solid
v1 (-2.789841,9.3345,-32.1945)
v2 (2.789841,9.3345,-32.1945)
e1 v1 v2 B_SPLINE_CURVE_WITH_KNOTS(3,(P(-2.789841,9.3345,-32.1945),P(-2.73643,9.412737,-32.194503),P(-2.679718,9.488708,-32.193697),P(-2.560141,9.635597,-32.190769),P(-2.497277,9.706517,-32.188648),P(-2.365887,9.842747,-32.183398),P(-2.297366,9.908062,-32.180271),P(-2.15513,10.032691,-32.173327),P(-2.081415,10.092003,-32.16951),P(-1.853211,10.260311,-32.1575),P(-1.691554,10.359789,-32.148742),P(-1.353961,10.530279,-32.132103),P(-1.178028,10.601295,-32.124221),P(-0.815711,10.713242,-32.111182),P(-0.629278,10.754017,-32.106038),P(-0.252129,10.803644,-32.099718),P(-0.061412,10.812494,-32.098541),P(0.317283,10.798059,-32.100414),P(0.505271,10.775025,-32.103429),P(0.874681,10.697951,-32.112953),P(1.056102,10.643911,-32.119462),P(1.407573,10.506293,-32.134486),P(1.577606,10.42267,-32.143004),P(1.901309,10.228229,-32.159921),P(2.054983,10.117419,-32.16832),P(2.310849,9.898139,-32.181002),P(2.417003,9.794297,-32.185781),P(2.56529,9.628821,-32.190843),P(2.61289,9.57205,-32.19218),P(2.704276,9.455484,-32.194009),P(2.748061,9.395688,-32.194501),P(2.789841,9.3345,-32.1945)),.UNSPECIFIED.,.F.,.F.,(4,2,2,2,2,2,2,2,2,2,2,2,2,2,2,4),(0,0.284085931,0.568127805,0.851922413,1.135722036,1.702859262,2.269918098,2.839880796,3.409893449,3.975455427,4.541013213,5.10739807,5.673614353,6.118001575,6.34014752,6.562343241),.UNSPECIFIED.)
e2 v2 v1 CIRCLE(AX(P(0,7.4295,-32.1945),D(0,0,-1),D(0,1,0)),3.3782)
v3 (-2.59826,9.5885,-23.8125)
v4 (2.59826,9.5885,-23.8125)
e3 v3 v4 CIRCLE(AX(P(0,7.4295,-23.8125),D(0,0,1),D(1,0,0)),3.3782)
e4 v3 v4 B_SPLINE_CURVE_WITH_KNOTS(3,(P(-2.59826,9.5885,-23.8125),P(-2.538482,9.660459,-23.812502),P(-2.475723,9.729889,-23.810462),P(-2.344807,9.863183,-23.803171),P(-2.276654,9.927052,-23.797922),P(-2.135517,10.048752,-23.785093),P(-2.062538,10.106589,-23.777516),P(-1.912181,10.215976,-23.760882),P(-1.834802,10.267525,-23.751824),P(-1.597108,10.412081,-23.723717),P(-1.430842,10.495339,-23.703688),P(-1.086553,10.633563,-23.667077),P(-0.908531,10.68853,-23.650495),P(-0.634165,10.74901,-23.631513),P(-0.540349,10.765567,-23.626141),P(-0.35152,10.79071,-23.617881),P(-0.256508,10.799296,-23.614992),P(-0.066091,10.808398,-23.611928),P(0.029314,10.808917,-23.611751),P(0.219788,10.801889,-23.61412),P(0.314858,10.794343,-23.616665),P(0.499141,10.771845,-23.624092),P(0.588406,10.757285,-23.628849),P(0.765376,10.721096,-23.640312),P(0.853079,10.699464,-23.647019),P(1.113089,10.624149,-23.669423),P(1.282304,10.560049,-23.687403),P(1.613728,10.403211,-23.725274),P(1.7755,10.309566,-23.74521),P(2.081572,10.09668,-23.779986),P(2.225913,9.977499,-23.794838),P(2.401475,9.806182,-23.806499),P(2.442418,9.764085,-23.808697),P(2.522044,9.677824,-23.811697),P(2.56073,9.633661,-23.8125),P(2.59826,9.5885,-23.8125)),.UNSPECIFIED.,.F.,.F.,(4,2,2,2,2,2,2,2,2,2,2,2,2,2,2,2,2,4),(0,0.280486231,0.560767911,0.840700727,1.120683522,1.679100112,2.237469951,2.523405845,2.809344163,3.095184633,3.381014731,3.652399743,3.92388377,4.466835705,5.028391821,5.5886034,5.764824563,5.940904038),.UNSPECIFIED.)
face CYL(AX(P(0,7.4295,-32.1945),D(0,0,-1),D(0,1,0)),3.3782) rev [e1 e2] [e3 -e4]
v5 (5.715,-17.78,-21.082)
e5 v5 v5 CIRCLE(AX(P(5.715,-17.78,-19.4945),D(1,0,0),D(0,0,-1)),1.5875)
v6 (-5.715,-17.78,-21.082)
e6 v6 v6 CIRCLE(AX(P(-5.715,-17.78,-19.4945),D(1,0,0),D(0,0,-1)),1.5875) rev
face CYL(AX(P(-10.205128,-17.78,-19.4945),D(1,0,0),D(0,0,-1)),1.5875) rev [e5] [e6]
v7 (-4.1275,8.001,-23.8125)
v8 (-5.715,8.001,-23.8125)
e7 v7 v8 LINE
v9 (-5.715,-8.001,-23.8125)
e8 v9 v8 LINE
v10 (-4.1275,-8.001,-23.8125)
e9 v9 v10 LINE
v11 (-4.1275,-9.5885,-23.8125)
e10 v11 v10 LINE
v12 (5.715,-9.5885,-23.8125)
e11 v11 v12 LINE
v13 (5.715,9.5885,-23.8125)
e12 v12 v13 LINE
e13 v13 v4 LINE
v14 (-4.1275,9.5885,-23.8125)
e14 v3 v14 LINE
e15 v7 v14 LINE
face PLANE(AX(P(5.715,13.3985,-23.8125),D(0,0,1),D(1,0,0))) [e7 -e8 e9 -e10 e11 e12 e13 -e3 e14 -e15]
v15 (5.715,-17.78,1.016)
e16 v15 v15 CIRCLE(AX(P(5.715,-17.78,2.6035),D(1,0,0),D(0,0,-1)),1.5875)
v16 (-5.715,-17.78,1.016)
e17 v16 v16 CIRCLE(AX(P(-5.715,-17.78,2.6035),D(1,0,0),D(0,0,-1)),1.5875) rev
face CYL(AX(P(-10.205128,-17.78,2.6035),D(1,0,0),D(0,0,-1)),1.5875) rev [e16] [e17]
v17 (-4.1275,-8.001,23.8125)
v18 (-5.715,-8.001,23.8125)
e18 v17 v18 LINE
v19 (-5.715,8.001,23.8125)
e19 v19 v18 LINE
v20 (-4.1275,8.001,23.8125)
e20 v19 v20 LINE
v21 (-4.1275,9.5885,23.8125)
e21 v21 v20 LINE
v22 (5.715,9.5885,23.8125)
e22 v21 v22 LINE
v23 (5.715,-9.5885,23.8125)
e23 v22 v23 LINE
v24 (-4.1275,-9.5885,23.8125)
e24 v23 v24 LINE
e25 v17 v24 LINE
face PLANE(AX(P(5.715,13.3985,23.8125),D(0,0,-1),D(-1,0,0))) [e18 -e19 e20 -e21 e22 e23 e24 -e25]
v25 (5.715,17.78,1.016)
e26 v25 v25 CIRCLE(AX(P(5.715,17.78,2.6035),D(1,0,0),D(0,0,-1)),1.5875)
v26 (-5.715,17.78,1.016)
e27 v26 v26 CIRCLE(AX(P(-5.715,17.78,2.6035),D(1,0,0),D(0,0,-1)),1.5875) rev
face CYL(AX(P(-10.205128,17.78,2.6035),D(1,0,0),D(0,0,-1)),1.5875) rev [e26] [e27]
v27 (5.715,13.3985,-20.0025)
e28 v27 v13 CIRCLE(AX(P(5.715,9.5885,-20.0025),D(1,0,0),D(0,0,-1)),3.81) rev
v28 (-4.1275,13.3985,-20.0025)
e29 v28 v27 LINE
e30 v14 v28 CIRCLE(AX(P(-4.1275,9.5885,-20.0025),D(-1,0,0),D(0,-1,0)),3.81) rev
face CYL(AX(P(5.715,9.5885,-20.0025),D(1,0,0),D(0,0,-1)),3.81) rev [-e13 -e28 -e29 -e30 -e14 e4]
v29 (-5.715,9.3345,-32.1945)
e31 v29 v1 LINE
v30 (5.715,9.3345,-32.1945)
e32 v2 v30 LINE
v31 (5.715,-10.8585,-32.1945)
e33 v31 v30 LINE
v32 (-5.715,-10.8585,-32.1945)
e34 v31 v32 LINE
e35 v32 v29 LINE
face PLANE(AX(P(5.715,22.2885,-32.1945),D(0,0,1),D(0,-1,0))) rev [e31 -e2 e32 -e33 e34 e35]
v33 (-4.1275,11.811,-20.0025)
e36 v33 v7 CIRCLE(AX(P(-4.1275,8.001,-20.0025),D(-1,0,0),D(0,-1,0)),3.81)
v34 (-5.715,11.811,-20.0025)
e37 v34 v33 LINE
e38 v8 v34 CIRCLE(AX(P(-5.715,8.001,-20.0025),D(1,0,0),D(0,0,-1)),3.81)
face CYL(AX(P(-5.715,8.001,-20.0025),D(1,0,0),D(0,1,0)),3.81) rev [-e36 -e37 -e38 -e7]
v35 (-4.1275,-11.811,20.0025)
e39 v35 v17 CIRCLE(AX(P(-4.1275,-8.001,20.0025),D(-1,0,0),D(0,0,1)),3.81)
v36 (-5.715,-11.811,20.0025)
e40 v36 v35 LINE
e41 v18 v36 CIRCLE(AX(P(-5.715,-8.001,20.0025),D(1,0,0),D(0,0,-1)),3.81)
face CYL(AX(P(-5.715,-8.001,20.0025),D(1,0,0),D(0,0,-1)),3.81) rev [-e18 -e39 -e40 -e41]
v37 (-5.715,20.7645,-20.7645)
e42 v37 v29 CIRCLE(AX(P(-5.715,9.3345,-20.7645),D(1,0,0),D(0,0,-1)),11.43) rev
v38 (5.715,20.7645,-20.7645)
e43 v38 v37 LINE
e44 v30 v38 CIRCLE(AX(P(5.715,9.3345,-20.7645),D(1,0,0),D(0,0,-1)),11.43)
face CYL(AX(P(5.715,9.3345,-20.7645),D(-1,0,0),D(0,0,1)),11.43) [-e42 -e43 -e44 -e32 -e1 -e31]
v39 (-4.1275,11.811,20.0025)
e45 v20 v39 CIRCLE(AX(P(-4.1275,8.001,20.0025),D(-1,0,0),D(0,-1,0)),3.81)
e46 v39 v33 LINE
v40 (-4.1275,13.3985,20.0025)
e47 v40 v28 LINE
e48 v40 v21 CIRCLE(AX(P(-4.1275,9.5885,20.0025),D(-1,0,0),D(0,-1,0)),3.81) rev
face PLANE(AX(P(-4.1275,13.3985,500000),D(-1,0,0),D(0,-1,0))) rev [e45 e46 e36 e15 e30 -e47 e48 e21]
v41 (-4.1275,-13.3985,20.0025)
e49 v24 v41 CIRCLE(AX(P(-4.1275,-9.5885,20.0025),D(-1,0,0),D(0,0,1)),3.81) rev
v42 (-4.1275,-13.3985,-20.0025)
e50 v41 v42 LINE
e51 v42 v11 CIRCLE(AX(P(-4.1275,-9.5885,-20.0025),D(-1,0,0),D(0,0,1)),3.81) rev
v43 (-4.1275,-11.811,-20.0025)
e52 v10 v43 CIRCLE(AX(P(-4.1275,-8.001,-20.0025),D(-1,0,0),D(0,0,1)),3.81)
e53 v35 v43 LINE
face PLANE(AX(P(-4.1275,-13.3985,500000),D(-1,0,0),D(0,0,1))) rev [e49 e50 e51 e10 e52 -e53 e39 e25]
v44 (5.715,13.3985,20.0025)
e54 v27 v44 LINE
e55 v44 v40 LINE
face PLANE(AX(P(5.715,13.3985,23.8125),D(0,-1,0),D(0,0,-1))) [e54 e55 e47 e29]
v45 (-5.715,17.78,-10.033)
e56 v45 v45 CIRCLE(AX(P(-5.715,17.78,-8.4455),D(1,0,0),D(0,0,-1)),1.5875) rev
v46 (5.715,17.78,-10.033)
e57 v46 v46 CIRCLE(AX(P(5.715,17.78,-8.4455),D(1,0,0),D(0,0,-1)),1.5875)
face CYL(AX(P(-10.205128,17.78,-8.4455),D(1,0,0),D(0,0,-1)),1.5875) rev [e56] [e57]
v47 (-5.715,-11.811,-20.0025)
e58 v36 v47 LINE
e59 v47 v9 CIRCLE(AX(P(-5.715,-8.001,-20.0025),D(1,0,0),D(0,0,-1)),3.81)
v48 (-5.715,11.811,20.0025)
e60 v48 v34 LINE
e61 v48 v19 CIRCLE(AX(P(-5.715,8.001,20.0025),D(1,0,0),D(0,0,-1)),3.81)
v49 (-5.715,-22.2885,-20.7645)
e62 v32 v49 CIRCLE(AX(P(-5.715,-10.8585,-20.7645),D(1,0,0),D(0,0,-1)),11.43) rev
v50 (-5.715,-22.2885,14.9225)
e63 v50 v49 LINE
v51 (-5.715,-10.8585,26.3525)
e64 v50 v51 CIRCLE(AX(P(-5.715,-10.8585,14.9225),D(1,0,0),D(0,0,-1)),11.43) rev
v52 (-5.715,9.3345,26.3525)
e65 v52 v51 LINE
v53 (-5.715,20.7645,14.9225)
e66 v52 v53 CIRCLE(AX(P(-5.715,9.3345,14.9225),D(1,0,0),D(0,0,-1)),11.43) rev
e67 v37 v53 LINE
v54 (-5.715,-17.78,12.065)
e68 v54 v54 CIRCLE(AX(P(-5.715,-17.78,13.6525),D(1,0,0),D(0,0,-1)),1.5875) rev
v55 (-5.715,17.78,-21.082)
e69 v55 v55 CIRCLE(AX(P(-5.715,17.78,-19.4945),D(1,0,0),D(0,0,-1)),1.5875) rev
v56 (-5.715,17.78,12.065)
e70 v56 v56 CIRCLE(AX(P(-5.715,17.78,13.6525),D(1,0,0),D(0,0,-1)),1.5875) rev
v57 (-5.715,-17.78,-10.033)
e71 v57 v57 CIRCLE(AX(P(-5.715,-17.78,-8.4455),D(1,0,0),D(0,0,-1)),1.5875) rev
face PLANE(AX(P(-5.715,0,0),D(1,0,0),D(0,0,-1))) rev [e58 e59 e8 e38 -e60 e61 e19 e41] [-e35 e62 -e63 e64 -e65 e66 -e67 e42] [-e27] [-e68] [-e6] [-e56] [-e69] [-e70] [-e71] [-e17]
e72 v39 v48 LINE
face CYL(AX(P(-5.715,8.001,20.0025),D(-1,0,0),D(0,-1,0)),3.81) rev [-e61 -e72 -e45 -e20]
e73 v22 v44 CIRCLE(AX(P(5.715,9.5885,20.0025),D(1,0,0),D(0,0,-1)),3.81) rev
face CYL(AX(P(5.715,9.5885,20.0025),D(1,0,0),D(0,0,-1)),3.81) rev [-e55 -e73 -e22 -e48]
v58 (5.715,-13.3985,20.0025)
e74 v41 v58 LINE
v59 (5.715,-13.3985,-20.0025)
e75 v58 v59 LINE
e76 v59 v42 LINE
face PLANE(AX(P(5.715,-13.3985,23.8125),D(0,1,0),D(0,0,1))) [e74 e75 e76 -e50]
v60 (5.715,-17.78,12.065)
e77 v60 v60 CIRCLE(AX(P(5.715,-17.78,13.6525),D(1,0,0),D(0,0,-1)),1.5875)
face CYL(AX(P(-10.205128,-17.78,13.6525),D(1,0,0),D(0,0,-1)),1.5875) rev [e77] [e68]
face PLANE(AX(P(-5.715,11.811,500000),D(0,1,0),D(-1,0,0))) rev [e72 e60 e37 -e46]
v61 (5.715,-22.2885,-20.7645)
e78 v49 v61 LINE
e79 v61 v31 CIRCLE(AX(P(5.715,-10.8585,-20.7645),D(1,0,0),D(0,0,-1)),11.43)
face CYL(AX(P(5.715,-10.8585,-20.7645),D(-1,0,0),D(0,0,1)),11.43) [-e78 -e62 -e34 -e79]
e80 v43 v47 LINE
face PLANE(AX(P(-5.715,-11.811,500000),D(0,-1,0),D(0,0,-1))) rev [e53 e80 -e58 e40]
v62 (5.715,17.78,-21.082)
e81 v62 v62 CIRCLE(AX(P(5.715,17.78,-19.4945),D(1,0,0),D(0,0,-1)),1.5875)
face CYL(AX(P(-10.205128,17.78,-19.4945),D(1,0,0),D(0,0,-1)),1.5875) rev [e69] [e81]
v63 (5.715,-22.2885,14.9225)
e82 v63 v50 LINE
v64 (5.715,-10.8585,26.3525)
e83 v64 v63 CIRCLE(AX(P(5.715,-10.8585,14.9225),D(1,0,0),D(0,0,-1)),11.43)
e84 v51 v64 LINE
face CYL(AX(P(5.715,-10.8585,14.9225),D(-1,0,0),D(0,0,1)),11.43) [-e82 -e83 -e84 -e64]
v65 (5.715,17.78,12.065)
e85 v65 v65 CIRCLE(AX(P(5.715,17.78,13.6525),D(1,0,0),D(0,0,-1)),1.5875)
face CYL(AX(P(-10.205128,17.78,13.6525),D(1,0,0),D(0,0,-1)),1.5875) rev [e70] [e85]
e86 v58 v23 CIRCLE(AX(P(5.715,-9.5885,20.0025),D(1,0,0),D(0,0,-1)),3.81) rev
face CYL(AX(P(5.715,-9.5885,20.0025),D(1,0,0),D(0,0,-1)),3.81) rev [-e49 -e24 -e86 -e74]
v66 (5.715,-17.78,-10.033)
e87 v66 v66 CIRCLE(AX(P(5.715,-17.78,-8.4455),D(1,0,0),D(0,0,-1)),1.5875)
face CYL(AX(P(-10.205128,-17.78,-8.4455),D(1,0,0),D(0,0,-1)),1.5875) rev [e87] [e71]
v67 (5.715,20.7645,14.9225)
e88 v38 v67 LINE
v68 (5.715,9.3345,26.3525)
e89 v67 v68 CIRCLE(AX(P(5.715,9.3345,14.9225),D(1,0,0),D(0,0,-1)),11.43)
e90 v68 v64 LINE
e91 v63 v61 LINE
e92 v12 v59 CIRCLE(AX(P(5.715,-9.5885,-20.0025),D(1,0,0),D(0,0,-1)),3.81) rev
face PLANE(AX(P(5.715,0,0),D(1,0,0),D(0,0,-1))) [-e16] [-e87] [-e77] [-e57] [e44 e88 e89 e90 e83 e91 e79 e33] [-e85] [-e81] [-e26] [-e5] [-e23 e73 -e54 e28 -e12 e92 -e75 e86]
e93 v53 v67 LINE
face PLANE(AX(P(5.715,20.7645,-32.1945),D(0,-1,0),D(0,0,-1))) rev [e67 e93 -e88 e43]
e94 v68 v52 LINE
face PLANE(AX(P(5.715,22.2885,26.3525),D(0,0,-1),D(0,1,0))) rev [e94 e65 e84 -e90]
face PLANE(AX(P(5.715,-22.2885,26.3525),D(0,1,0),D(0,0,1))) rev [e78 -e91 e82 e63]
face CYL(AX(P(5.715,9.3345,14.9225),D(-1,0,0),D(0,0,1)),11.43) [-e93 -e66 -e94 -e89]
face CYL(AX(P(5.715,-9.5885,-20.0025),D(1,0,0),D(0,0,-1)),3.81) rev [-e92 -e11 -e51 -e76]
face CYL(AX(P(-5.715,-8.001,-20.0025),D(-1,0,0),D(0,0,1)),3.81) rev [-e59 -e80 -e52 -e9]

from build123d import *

# Parameters (mm, degrees)
SKETCH1_W                   = 58.547
SKETCH1_H                   = 44.577
SKETCH1_W_2                 = 47.625
SKETCH1_H_2                 = 26.797
BOSS_EXTRUDE1_DEPTH         = 5.715
BOSS_EXTRUDE2_REACH         = 57.19
SKETCH9_W                   = 1.5875
SKETCH9_H                   = 1.5875
FILLET11_R                  = 3.81
FILLET12_R                  = 3.81
F_1_4_CLEARANCE_HOLE1_D     = 6.7564
F_1_4_CLEARANCE_HOLE1_DEPTH = 8.89
F_1_4_CLEARANCE_HOLE1_TIP   = 2.029827343
F_6_32_TAPPED_HOLE1_D       = 2.7051
SKETCH22_W                  = 58.547
SKETCH22_H                  = 9.177220827
CUT_EXTRUDE4_DEPTH          = 41.791028073
FILLET14_R                  = 11.43
FILLET13_R                  = 11.43
SKETCH24_R                  = 1.5875
CUT_EXTRUDE5_DEPTH          = 11.43


with BuildPart() as part:
    # Sketch1 → Boss-Extrude1 (new, symmetric)
    with BuildSketch(Plane(origin=(0, 0, 0), x_dir=(0, 0, -1), z_dir=(1, 0, 0))):
        with Locations((2.921, 0)):
            Rectangle(SKETCH1_W, SKETCH1_H)
        Rectangle(SKETCH1_W_2, SKETCH1_H_2, mode=Mode.SUBTRACT)
    extrude(amount=BOSS_EXTRUDE1_DEPTH, both=True)

    # Sketch9 → Boss-Extrude2 (add, up to next)
    with BuildSketch(Plane.XY.offset(-23.8125), mode=Mode.PRIVATE) as boss_extrude2_sk1:
        with Locations((-4.92125, 12.60475)):
            Rectangle(SKETCH9_W, SKETCH9_H)
    boss_extrude2_tool1 = extrude(boss_extrude2_sk1.sketch, amount=BOSS_EXTRUDE2_REACH, mode=Mode.PRIVATE) - part.part
    # Sketch9 → Boss-Extrude2 (add, up to next)
    with BuildSketch(Plane.XY.offset(-23.8125), mode=Mode.PRIVATE) as boss_extrude2_sk2:
        with Locations((-4.92125, -12.60475)):
            Rectangle(SKETCH9_W, SKETCH9_H)
    boss_extrude2_tool2 = extrude(boss_extrude2_sk2.sketch, amount=BOSS_EXTRUDE2_REACH, mode=Mode.PRIVATE) - part.part
    add(boss_extrude2_tool1.solids().sort_by_distance((-4.92125, 12.60475, -23.8125))[0])
    add(boss_extrude2_tool2.solids().sort_by_distance((-4.92125, -12.60475, -23.8125))[0])

    # Fillet11
    fillet11_edges = [part.edges().sort_by_distance(p)[0] for p in [
        (-4.92125, -11.811, 23.8125),
        (-4.92125, -11.811, -23.8125),
        (-4.92125, 11.811, 23.8125),
        (-4.92125, 11.811, -23.8125),
    ]]
    fillet(fillet11_edges, radius=FILLET11_R)

    # Fillet12
    fillet12_edges = [part.edges().sort_by_distance(p)[0] for p in [
        (0.79375, 13.3985, 23.8125),
        (0.79375, -13.3985, 23.8125),
        (0.79375, -13.3985, -23.8125),
        (0.79375, 13.3985, -23.8125),
    ]]
    fillet(fillet12_edges, radius=FILLET12_R)

    # 1/4 Clearance Hole1
    with Locations(Plane(origin=(-2.530789808, 6.493019647, -32.1945), x_dir=(1, 0, 0), z_dir=(0, 0, -1))):
        with Locations((2.530789808, -0.936480353)):
            Hole(F_1_4_CLEARANCE_HOLE1_D / 2, depth=F_1_4_CLEARANCE_HOLE1_DEPTH)
            with Locations((0, 0, -(F_1_4_CLEARANCE_HOLE1_DEPTH + F_1_4_CLEARANCE_HOLE1_TIP / 2))):  # 118° drill point
                Cone(0, F_1_4_CLEARANCE_HOLE1_D / 2, F_1_4_CLEARANCE_HOLE1_TIP, mode=Mode.SUBTRACT)

    # #6-32 Tapped Hole1 (through all)
    with Locations(Plane(origin=(5.715, 17.955600219, 19.212274833), x_dir=(0, 0, 1), z_dir=(1, 0, 0))):
        with Locations((-27.657774833, 0.175600219), (-16.608774833, 0.175600219), (-5.559774833, 0.175600219), (-38.706774833, 0.175600219), (-38.706774833, 35.735600219), (-27.657774833, 35.735600219), (-16.608774833, 35.735600219), (-5.559774833, 35.735600219)):
            Hole(F_6_32_TAPPED_HOLE1_D / 2)

    # Sketch22 → Cut-Extrude4 (cut, through all)
    with BuildSketch(Plane.ZY.offset(5.715)):
        with Locations((-2.921, 25.353110414)):
            Rectangle(SKETCH22_W, SKETCH22_H)
    extrude(amount=-CUT_EXTRUDE4_DEPTH, mode=Mode.SUBTRACT)

    # Fillet14
    fillet14_edges = [part.edges().sort_by_distance(p)[0] for p in [
        (0, 20.7645, 26.3525),
        (0, -22.2885, 26.3525),
    ]]
    fillet(fillet14_edges, radius=FILLET14_R)

    # Fillet13
    # the kernel refuses this fillet: 11.43 mm, written as the material it takes off along each edge
    with BuildSketch(Plane(origin=(-34.29, 20.7645, -32.1945), x_dir=(0, 0, 1), z_dir=(1, 0, 0)), Plane(origin=(34.29, -22.2885, -32.1945), x_dir=(0, 0, 1), z_dir=(-1, 0, 0))) as fillet13_piece_1:
        with BuildLine():
            CenterArc((FILLET13_R, FILLET13_R), FILLET13_R, 180, 90)
            Line((0, FILLET13_R), (0, 0))
            Line((0, 0), (FILLET13_R, 0))
        make_face()
    extrude(amount=68.58, mode=Mode.SUBTRACT)

    # Sketch24 → Cut-Extrude5 (cut)
    with BuildSketch(Plane(origin=(5.715, 0, 0), x_dir=(0, 0, -1), z_dir=(1, 0, 0))):
        with Locations((19.4945, -17.78)):
            Circle(SKETCH24_R)
        with Locations((8.4455, -17.78)):
            Circle(SKETCH24_R)
        with Locations((-2.6035, -17.78)):
            Circle(SKETCH24_R)
        with Locations((-13.6525, -17.78)):
            Circle(SKETCH24_R)
        with Locations((-13.6525, 17.78)):
            Circle(SKETCH24_R)
        with Locations((-2.6035, 17.78)):
            Circle(SKETCH24_R)
        with Locations((8.4455, 17.78)):
            Circle(SKETCH24_R)
        with Locations((19.4945, 17.78)):
            Circle(SKETCH24_R)
    extrude(amount=-CUT_EXTRUDE5_DEPTH, mode=Mode.SUBTRACT)


solid = part.part
